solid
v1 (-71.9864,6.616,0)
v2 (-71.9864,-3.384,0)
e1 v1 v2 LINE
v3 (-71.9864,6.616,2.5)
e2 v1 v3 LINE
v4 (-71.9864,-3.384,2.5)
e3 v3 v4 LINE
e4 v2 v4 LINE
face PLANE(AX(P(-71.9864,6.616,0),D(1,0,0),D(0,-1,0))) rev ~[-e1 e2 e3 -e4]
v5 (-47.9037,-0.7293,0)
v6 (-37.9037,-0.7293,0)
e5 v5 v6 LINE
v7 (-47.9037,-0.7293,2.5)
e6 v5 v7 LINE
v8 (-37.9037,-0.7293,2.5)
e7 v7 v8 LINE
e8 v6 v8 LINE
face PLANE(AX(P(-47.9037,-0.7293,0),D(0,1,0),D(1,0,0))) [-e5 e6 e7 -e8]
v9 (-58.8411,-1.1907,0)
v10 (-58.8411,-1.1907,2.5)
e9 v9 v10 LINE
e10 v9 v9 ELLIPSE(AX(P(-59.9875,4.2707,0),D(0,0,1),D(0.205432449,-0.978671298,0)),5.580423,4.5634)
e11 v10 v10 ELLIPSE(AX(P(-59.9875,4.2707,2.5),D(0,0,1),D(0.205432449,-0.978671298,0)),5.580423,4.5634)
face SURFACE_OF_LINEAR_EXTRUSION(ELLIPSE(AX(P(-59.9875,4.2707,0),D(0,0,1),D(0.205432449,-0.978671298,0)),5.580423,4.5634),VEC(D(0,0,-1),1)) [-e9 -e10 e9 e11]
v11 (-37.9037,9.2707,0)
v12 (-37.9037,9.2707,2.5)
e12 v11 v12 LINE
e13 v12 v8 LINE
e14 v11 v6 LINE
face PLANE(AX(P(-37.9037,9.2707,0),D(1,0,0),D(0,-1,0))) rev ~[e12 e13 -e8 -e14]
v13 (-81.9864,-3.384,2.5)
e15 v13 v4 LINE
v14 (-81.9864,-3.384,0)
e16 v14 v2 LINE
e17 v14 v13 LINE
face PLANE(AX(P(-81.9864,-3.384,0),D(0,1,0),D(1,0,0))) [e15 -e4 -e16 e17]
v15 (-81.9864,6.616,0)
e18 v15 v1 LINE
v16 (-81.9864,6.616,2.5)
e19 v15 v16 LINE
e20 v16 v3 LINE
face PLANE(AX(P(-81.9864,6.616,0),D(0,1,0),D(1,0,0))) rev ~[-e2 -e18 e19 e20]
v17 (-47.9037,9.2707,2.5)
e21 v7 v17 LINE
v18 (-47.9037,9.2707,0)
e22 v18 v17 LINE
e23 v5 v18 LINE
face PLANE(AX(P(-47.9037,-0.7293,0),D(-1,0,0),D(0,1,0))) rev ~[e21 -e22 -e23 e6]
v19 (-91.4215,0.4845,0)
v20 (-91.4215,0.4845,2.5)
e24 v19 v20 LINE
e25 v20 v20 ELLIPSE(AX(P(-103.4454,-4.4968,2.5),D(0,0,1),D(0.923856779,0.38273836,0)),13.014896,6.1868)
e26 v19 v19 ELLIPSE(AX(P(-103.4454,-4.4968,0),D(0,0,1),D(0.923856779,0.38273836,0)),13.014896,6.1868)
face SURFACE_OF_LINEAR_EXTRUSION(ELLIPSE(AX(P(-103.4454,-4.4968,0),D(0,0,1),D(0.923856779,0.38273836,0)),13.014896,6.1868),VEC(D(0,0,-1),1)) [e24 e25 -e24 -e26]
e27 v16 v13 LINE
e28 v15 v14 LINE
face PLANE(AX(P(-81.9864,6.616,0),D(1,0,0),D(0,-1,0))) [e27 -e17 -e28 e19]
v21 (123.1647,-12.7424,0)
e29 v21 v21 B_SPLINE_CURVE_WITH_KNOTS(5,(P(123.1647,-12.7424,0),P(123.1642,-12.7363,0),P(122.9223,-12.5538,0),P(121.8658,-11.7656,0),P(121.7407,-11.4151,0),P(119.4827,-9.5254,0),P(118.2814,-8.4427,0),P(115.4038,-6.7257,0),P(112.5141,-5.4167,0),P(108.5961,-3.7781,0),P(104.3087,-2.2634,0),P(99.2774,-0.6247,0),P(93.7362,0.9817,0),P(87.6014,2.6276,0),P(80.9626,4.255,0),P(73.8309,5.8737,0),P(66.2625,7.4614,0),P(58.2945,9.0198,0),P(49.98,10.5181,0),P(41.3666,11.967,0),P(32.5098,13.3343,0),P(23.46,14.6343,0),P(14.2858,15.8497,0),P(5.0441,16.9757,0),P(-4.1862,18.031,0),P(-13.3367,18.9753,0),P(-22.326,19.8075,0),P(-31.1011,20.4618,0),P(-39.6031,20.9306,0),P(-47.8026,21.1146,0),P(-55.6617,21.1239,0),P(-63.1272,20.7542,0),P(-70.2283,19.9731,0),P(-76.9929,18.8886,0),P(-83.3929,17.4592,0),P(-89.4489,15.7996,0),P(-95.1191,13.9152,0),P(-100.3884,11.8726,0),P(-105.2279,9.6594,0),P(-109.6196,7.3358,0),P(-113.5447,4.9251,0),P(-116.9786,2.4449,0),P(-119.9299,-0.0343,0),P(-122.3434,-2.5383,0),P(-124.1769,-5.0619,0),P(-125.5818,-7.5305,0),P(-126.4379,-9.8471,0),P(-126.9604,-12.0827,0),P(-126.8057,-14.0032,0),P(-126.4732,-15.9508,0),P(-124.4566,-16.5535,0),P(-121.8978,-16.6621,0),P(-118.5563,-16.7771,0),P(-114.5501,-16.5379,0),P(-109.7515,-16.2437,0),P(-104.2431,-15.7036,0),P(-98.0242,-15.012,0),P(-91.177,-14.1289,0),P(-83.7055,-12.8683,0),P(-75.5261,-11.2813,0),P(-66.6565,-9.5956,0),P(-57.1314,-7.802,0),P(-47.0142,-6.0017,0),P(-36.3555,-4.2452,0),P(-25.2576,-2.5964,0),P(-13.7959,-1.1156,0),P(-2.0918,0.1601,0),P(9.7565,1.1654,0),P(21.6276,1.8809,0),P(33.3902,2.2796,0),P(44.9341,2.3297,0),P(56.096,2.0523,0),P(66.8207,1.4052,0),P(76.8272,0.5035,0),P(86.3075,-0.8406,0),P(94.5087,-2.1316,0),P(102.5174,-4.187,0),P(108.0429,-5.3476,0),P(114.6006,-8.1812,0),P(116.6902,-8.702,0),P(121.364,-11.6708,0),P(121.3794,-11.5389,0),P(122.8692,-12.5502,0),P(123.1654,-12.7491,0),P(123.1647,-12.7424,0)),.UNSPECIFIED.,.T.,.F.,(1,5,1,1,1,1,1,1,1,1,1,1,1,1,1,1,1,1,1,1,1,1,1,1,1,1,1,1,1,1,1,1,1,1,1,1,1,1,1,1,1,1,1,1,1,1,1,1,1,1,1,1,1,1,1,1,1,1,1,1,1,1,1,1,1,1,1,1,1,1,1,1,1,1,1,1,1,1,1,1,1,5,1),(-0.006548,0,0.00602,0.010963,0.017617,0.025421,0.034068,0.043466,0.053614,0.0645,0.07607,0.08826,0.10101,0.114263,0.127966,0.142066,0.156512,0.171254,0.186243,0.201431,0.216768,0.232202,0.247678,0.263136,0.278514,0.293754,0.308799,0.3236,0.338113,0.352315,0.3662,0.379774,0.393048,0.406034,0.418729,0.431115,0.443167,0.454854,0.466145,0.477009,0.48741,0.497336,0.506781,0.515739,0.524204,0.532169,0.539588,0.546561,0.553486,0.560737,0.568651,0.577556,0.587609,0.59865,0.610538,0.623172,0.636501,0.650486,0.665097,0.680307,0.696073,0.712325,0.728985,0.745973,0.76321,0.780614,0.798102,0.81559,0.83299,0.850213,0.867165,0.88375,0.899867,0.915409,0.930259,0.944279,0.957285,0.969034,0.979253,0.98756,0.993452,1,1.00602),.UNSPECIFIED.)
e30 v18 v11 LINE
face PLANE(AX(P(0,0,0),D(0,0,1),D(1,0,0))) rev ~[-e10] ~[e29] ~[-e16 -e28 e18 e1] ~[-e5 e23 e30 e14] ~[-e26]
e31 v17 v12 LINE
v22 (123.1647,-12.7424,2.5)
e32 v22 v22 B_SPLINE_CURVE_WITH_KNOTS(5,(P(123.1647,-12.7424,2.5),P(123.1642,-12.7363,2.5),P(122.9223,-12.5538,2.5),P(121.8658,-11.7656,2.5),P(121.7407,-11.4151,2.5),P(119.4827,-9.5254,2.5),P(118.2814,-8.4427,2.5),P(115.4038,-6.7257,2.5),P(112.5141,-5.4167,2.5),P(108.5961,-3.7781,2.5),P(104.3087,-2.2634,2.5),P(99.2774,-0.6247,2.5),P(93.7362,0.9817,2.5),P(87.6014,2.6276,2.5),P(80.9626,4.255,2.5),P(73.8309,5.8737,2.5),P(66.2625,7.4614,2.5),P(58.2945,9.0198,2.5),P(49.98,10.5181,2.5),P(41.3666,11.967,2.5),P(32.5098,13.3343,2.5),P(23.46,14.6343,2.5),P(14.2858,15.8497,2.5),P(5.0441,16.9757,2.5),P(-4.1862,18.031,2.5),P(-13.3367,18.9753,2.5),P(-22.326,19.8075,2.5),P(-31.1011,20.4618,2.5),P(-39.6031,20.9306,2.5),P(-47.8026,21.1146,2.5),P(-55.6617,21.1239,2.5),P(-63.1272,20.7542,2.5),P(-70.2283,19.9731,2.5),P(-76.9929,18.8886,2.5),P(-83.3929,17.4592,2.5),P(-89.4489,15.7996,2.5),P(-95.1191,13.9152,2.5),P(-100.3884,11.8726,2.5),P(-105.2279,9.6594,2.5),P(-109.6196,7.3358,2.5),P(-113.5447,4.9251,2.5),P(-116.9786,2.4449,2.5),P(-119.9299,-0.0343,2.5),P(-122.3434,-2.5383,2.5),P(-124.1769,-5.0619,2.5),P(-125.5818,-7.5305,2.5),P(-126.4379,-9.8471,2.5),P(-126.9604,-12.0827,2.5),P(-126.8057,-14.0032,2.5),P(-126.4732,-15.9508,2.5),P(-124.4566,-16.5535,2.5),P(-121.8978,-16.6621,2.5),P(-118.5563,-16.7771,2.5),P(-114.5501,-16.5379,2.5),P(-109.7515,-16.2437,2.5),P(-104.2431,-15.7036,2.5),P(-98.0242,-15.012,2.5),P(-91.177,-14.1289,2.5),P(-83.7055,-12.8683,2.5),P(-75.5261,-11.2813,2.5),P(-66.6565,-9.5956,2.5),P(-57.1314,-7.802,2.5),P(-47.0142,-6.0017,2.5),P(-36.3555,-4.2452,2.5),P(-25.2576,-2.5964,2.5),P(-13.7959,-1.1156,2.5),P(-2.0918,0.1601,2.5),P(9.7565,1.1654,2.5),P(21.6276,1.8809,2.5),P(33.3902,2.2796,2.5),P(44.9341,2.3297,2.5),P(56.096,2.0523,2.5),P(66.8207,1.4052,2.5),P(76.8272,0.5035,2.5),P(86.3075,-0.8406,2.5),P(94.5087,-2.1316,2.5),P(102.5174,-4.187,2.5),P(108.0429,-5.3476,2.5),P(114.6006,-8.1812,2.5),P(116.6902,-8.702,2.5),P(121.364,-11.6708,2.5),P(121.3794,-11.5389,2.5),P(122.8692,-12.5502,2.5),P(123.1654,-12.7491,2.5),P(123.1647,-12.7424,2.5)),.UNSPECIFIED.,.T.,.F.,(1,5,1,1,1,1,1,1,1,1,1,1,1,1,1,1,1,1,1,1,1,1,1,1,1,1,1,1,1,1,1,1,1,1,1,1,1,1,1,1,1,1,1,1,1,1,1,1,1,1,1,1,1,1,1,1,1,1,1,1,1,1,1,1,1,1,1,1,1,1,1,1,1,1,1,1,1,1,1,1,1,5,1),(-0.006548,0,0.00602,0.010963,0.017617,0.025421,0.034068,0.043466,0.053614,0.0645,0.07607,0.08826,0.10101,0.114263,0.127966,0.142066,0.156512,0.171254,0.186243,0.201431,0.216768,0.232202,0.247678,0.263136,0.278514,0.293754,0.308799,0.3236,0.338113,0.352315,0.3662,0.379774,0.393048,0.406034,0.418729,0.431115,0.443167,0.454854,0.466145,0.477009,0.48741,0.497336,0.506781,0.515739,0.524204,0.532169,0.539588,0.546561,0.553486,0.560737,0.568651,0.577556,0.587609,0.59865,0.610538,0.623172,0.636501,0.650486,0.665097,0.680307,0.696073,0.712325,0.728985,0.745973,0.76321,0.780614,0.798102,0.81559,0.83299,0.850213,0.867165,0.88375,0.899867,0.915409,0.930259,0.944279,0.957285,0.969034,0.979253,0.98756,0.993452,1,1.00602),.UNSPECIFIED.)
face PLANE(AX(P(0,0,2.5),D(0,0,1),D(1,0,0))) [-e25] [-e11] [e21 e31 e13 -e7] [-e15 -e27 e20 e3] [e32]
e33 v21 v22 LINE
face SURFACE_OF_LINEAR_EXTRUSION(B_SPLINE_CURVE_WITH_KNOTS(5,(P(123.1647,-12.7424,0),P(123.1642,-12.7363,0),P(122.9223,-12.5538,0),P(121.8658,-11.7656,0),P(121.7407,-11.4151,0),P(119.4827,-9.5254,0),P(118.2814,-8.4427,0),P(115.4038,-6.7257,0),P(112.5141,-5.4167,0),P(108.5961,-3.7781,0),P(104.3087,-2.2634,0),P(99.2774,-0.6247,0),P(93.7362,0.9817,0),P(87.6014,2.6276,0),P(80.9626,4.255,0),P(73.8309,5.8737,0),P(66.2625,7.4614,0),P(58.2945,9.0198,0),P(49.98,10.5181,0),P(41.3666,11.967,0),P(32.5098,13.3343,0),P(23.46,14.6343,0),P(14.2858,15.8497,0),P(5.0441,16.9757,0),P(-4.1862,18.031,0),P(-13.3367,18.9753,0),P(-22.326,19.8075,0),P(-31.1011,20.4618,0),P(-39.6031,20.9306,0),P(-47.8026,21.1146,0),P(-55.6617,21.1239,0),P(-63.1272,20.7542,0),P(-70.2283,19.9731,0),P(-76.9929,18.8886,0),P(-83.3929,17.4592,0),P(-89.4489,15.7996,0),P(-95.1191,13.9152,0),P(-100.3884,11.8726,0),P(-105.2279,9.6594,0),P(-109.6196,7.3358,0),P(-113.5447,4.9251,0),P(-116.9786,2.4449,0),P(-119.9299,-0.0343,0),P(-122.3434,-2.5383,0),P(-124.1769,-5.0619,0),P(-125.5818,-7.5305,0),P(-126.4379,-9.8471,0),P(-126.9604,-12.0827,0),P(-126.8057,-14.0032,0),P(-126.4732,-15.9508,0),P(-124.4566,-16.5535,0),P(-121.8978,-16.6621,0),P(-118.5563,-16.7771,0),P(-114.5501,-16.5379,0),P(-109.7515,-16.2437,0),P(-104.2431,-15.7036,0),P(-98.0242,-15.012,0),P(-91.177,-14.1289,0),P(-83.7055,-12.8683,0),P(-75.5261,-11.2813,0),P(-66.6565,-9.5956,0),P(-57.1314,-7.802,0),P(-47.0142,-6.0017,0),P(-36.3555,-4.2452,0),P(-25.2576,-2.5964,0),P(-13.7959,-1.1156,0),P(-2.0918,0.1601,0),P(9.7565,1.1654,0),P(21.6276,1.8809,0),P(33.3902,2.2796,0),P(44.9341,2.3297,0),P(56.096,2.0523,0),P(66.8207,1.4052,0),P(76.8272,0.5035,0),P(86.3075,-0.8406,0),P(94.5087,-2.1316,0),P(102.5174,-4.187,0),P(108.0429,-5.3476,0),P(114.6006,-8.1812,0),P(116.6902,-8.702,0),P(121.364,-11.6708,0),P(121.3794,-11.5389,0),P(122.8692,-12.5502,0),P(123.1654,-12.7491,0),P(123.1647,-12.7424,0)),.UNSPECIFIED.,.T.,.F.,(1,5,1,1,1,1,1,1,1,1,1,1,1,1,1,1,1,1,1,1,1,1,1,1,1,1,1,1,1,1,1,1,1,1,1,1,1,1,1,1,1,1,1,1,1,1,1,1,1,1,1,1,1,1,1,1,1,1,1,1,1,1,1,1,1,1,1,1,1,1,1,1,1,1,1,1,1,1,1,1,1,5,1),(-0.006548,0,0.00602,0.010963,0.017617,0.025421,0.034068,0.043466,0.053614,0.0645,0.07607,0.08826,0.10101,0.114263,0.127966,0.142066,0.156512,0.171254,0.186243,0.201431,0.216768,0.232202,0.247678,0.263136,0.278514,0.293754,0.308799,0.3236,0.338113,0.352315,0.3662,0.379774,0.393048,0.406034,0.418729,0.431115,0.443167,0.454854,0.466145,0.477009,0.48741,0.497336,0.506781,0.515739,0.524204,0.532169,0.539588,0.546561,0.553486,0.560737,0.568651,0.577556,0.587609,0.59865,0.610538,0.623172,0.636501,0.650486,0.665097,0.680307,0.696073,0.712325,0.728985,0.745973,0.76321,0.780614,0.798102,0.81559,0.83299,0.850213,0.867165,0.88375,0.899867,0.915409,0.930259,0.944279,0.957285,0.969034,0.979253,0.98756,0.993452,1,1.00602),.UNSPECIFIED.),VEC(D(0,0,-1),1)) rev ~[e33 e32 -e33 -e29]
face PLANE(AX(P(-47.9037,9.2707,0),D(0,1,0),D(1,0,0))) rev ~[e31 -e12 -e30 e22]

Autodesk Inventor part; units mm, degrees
ref_plane "YZ Plane" through (0, 0, 0) normal (1, 0, 0) x (0, 1, 0)
ref_plane "XZ Plane" through (0, 0, 0) normal (0, 1, 0) x (-1, 0, 0)
ref_plane "XY Plane" through (0, 0, 0) normal (0, 0, 1) x (1, 0, 0)
sketch "Sketch1" plane through (0, 0, 0) normal (0, 0, 1) x (1, 0, 0)
  spline S0 degree 5 poles (123.1647, -12.7424) (123.1642, -12.7363) (122.9223, -12.5538) (121.8658, -11.7656) (121.7407, -11.4151) (119.4827, -9.5254) (118.2814, -8.4427) (115.4038, -6.7257) (112.5141, -5.4167) (108.5961, -3.7781) (104.3087, -2.2634) (99.2774, -0.6247) (93.7362, 0.9817) (87.6014, 2.6276) (80.9626, 4.255) (73.8309, 5.8737) (66.2625, 7.4614) (58.2945, 9.0198) (49.98, 10.5181) (41.3666, 11.967) (32.5098, 13.3343) (23.46, 14.6343) (14.2858, 15.8497) (5.0441, 16.9757) (-4.1862, 18.031) (-13.3367, 18.9753) (-22.326, 19.8075) (-31.1011, 20.4618) (-39.6031, 20.9306) (-47.8026, 21.1146) (-55.6617, 21.1239) (-63.1272, 20.7542) (-70.2283, 19.9731) (-76.9929, 18.8886) (-83.3929, 17.4592) (-89.4489, 15.7996) (-95.1191, 13.9152) (-100.3884, 11.8726) (-105.2279, 9.6594) (-109.6196, 7.3358) (-113.5447, 4.9251) (-116.9786, 2.4449) (-119.9299, -0.0343) (-122.3434, -2.5383) (-124.1769, -5.0619) (-125.5818, -7.5305) (-126.4379, -9.8471) (-126.9604, -12.0827) (-126.8057, -14.0032) (-126.4732, -15.9508) (-124.4566, -16.5535) (-121.8978, -16.6621) (-118.5563, -16.7771) (-114.5501, -16.5379) (-109.7515, -16.2437) (-104.2431, -15.7036) (-98.0242, -15.012) (-91.177, -14.1289) (-83.7055, -12.8683) (-75.5261, -11.2813) (-66.6565, -9.5956) (-57.1314, -7.802) (-47.0142, -6.0017) (-36.3555, -4.2452) (-25.2576, -2.5964) (-13.7959, -1.1156) (-2.0918, 0.1601) (9.7565, 1.1654) (21.6276, 1.8809) (33.3902, 2.2796) (44.9341, 2.3297) (56.096, 2.0523) (66.8207, 1.4052) (76.8272, 0.5035) (86.3075, -0.8406) (94.5087, -2.1316) (102.5174, -4.187) (108.0429, -5.3476) (114.6006, -8.1812) (116.6902, -8.702) (121.364, -11.6708) (121.3794, -11.5389) (122.8692, -12.5502) (123.1654, -12.7491) (123.1647, -12.7424) knots 0 0 0 0 0 0 0.00602 0.010963 0.017617 0.025421 0.034068 0.043466 0.053614 0.0645 0.07607 0.08826 0.10101 0.114263 0.127966 0.142066 0.156512 0.171254 0.186243 0.201431 0.216768 0.232202 0.247678 0.263136 0.278514 0.293754 0.308799 0.3236 0.338113 0.352315 0.3662 0.379774 0.393048 0.406034 0.418729 0.431115 0.443167 0.454854 0.466145 0.477009 0.48741 0.497336 0.506781 0.515739 0.524204 0.532169 0.539588 0.546561 0.553486 0.560737 0.568651 0.577556 0.587609 0.59865 0.610538 0.623172 0.636501 0.650486 0.665097 0.680307 0.696073 0.712325 0.728985 0.745973 0.76321 0.780614 0.798102 0.81559 0.83299 0.850213 0.867165 0.88375 0.899867 0.915409 0.930259 0.944279 0.957285 0.969034 0.979253 0.98756 0.993452 1 1 1 1 1 1
  line L0 (-47.9037, -0.7293) -> (-37.9037, -0.7293)
  line L1 (-37.9037, -0.7293) -> (-47.9037, -0.7293)
  line L2 (-81.9864, -3.384) -> (-71.9864, -3.384)
  line L3 (-71.9864, -3.384) -> (-81.9864, -3.384)
  line L4 (-81.9864, 6.616) -> (-81.9864, -3.384)
  line L5 (-81.9864, -3.384) -> (-81.9864, 6.616)
  line L6 (-71.9864, -3.384) -> (-81.9864, -3.384)
  line L7 (-81.9864, -3.384) -> (-81.9864, 6.616)
  line L8 (-81.9864, 6.616) -> (-71.9864, 6.616)
  line L9 (-71.9864, 6.616) -> (-71.9864, -3.384)
  line L10 (-81.9864, -3.384) -> (-71.9864, -3.384)
  line L11 (-71.9864, -3.384) -> (-71.9864, 6.616)
  line L12 (-71.9864, 6.616) -> (-81.9864, 6.616)
  line L13 (-81.9864, 6.616) -> (-81.9864, -3.384)
  line L14 (-71.9864, 6.616) -> (-81.9864, 6.616)
  line L15 (-81.9864, 6.616) -> (-71.9864, 6.616)
  line L16 (-37.9037, 9.2707) -> (-37.9037, -0.7293)
  line L17 (-37.9037, -0.7293) -> (-37.9037, 9.2707)
  line L18 (-47.9037, 9.2707) -> (-37.9037, 9.2707)
  line L19 (-37.9037, 9.2707) -> (-47.9037, 9.2707)
  line L20 (-47.9037, -0.7293) -> (-47.9037, 9.2707)
  line L21 (-47.9037, 9.2707) -> (-47.9037, -0.7293)
  ellipse E0 centre (-103.4454, -4.4968) end of major axis (-91.4215, 0.4845) minor radius 6.1868
  line L22 (-37.9037, -0.7293) -> (-37.9037, 9.2707)
  line L23 (-37.9037, 9.2707) -> (-37.9037, -0.7293)
  line L24 (-37.9037, -0.7293) -> (-47.9037, -0.7293)
  line L25 (-47.9037, -0.7293) -> (-47.9037, 9.2707)
  line L26 (-47.9037, 9.2707) -> (-37.9037, 9.2707)
  line L27 (-37.9037, 9.2707) -> (-37.9037, -0.7293)
  line L28 (-47.9037, -0.7293) -> (-37.9037, -0.7293)
  line L29 (-37.9037, -0.7293) -> (-37.9037, 9.2707)
  line L30 (-37.9037, 9.2707) -> (-47.9037, 9.2707)
  line L31 (-47.9037, 9.2707) -> (-47.9037, -0.7293)
  line L32 (-37.9037, 9.2707) -> (-47.9037, 9.2707)
  line L33 (-47.9037, 9.2707) -> (-37.9037, 9.2707)
  line L34 (-47.9037, 9.2707) -> (-47.9037, -0.7293)
  line L35 (-47.9037, -0.7293) -> (-47.9037, 9.2707)
  ellipse E1 centre (-59.9875, 4.2707) end of major axis (-58.8411, -1.1907) minor radius 4.5634
  line L36 (-71.9864, -3.384) -> (-71.9864, 6.616)
  line L37 (-71.9864, 6.616) -> (-71.9864, -3.384)
  line L38 (-81.9864, -3.384) -> (-71.9864, -3.384)
  line L39 (-71.9864, -3.384) -> (-81.9864, -3.384)
  line L40 (-71.9864, -3.384) -> (-71.9864, 6.616)
  line L41 (-71.9864, 6.616) -> (-71.9864, -3.384)
  line L42 (-71.9864, 6.616) -> (-81.9864, 6.616)
  line L43 (-81.9864, 6.616) -> (-71.9864, 6.616)
  line L44 (-81.9864, -3.384) -> (-81.9864, 6.616)
  line L45 (-81.9864, 6.616) -> (-81.9864, -3.384)
  line L46 (-37.9037, -0.7293) -> (-47.9037, -0.7293)
  line L47 (-47.9037, -0.7293) -> (-37.9037, -0.7293)
  point P0 (0, 0)
  point P1 (123.1647, -12.7424)
  point P2 (123.1647, -12.7424)
extrude "Extrusion1" add sketch "Sketch1" along normal blind 2.5
properties part number "new air foil"
